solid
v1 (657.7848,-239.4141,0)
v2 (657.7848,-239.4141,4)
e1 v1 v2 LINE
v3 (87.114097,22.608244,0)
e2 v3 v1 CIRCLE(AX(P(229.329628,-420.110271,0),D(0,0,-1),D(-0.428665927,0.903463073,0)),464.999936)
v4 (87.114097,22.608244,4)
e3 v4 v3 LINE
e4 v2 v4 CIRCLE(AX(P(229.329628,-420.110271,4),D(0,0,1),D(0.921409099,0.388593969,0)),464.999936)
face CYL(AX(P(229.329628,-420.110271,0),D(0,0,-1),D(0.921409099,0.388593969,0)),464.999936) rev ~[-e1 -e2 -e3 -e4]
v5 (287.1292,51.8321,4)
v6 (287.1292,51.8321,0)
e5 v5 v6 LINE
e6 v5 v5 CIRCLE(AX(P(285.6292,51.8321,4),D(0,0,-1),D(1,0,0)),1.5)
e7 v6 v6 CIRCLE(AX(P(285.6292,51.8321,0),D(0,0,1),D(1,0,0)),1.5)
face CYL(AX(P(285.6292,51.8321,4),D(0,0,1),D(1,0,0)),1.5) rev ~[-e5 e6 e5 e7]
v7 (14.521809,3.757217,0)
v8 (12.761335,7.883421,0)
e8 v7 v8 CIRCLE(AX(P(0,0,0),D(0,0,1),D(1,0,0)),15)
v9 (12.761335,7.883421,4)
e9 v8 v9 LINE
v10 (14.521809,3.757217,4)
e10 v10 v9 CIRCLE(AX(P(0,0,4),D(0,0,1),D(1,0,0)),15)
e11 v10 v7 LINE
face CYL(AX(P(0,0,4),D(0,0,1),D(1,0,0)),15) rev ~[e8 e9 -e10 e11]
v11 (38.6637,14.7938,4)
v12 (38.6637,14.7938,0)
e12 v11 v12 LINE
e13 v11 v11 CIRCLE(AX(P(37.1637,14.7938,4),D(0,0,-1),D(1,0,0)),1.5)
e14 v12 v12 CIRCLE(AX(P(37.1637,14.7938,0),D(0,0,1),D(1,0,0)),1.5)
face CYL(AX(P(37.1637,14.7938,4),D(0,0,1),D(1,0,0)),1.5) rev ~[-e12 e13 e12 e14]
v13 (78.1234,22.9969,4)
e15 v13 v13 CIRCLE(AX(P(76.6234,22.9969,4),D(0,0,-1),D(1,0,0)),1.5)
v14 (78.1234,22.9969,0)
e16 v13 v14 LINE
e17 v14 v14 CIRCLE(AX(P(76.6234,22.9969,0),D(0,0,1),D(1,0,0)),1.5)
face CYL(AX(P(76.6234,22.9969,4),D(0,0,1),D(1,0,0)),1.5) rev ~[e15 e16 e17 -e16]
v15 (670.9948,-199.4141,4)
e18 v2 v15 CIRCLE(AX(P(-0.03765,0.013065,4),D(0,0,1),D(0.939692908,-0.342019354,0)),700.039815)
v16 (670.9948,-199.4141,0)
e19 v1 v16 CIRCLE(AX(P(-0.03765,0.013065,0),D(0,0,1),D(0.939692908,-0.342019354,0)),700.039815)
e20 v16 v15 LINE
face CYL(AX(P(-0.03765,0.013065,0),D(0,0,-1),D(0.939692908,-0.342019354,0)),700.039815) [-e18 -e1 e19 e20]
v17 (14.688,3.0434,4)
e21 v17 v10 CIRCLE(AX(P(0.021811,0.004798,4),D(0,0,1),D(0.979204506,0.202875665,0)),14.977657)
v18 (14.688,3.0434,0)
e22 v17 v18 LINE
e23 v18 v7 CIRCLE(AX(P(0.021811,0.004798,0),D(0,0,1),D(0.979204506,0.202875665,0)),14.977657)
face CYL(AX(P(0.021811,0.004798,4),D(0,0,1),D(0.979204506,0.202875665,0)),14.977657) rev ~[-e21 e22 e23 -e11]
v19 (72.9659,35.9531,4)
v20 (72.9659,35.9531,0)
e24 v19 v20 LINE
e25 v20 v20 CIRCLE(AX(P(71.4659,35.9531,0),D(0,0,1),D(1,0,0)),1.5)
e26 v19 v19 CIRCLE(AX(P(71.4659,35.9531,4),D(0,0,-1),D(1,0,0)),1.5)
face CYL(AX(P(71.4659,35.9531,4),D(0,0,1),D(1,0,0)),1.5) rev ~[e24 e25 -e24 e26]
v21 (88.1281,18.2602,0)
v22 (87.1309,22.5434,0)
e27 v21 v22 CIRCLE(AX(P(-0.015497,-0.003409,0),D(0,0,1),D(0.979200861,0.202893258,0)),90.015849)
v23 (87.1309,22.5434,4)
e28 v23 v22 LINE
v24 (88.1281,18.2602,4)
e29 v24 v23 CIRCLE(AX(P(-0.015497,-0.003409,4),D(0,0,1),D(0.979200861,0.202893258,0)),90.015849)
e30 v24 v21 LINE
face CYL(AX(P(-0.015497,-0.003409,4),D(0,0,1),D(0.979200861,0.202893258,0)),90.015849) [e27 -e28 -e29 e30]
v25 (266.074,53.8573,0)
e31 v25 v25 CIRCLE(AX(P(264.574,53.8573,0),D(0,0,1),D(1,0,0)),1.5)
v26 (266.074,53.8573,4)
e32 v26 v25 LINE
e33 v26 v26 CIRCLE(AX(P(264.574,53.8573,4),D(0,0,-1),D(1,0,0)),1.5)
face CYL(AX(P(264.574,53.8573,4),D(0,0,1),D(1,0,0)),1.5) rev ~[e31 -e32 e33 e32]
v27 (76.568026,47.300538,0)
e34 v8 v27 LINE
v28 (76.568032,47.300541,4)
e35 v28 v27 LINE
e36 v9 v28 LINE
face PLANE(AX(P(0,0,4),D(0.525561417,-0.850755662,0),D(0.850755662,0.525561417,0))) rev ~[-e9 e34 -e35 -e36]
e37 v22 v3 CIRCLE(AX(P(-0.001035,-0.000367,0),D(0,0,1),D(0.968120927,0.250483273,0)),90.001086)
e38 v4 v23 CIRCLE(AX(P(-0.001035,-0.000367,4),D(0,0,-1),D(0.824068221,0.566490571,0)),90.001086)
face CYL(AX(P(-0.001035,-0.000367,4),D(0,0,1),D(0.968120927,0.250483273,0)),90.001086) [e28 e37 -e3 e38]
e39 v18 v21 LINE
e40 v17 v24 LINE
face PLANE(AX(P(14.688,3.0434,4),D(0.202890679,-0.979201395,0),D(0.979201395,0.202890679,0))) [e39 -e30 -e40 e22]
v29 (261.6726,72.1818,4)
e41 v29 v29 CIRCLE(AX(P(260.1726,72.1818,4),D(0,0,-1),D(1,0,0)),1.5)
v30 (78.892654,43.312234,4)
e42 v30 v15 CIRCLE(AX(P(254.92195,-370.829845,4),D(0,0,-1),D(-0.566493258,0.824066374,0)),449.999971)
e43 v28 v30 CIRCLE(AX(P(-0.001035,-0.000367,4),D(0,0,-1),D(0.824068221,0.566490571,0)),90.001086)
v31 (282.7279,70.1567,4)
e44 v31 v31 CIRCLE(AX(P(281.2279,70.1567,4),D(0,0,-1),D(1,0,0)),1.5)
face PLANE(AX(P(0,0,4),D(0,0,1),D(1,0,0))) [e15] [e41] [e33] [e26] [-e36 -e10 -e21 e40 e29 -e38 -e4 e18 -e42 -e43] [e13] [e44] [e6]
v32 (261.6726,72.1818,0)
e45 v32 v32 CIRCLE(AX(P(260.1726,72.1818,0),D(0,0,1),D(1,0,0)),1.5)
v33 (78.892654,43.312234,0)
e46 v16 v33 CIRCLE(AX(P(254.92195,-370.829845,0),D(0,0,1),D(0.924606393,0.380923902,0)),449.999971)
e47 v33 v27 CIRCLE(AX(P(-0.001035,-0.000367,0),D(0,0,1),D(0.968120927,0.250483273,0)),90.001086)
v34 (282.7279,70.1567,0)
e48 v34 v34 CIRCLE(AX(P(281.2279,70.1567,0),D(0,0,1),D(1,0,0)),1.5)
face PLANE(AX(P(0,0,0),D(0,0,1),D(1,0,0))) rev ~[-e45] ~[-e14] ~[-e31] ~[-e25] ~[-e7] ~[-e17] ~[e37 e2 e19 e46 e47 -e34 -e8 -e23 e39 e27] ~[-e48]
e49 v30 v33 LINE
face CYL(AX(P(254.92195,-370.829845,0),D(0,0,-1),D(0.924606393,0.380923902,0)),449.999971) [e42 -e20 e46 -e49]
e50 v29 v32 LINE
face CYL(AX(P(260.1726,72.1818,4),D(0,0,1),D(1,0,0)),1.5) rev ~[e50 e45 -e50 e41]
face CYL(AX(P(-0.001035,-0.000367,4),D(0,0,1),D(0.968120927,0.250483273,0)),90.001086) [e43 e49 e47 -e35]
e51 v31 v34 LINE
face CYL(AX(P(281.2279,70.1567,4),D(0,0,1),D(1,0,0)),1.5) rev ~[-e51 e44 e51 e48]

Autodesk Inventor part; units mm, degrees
ref_plane "YZ Plane" through (0, 0, 0) normal (1, 0, 0) x (0, 1, 0)
ref_plane "XZ Plane" through (0, 0, 0) normal (0, 1, 0) x (-1, 0, 0)
ref_plane "XY Plane" through (0, 0, 0) normal (0, 0, 1) x (1, 0, 0)
sketch "Sketch1" plane through (0, 0, 0) normal (0, 0, 1) x (1, 0, 0)
  arc A0 (670.9948, -199.4141) -> (0, 0) centre (254.9219, -370.8299) ccw
  arc A1 (657.7848, -239.4141) -> (30, 0) centre (229.3296, -420.1103) ccw
  arc A2 (657.7848, -239.4141) -> (670.9948, -199.4141) centre (0, 0) ccw
  line L0 (0, 0) -> (30, 0)
  line L1 (657.7848, -239.4141) -> (0, 0)
  line L2 (-143.7228, 0) -> (862.3369, 0) projected
  point P0 (0, 0)
  dimension "d1" = 30
  dimension "d2" = 40
  dimension "d4" = 20
  dimension "d5" = 465
  dimension "d6" = 450
  dimension "d22" = 700
extrude "Extrusion1" add sketch "Sketch1" along normal blind 4 contours A2 A1 L2 A0 | L2 A1 L0 A0
sketch "Sketch2" plane through (0, 0, 4) normal (0, 0, 1) x (1, 0, 0)
  arc A0 (670.9948, -199.4141) -> (0, 0) centre (254.9219, -370.8299) ccw projected
  arc A1 (87.1309, 22.5434) -> (74.166, 50.9844) centre (0, 0) ccw
  line L0 (74.166, 50.9844) -> (0, 0)
  line L1 (0, 0) -> (87.1309, 22.5434)
  line L2 (0, 0) -> (30, 0) projected
  point P0 (78.8927, 43.3122)
  point P1 (0, 0)
  point P2 (0, 0)
  dimension "d9" = 90
  dimension "d16" = 20
extrude "Extrusion2" add sketch "Sketch2" against normal blind 4
sketch "Sketch4" plane through (0, 0, 4) normal (0, 0, 1) x (1, 0, 0)
  line L0 (86.0304, 22.2587) -> (87.1309, 22.5434) projected
  line L1 (74.166, 50.9844) -> (0, 0) projected
  line L2 (87.1309, 22.5434) -> (0, 0)
  line L3 (0, 0) -> (30, 0)
  arc A0 (86.0304, 22.2587) -> (30, 0) centre (229.3296, -420.1103) ccw projected
  line L4 (30, 0) -> (86.0304, 22.2587)
  point P0 (86.0304, 22.2587)
extrude "Extrusion4" cut sketch "Sketch4" against normal blind 10 contours A0 L3 L2
sketch "Sketch6" plane through (0, 0, 4) normal (0, 0, 1) x (1, 0, 0)
  circle A0 centre (71.4659, 35.9531) radius 1.5
  circle A1 centre (76.6234, 22.9969) radius 1.5
  circle A2 centre (37.1637, 14.7938) radius 1.5
  line L0 (0, 0) -> (87.1309, 22.5434) projected
  line L1 (37.1637, 14.7938) -> (0, 0)
  line L2 (0, 0) -> (71.4659, 35.9531)
  line L3 (74.166, 50.9844) -> (0, 0) projected
  line L4 (76.6234, 22.9969) -> (0, 0)
  circle A3 centre (264.574, 53.8573) radius 1.5
  circle A4 centre (260.1726, 72.1818) radius 1.5
  line L5 (261.3927, 67.6302) -> (0, 0)
  line L6 (264.574, 53.8573) -> (0, 0)
  circle A5 centre (281.2279, 70.1567) radius 1.5
  circle A6 centre (285.6292, 51.8321) radius 1.5
  line L7 (264.574, 53.8573) -> (260.1726, 72.1818)
  line L8 (281.2279, 70.1567) -> (260.1726, 72.1818)
  line L9 (281.2279, 70.1567) -> (285.6292, 51.8321)
  line L10 (285.6292, 51.8321) -> (264.574, 53.8573)
  line L11 (260.1726, 72.1818) -> (0, 0)
  dimension "d23" = 7.2
  dimension "d24" = 2.2
  dimension "d25" = 7.8
  dimension "d26" = 80
  dimension "d27" = 80
  dimension "d28" = 40
  dimension "d29" = 3
  dimension "d30" = 3
  dimension "d31" = 3
  dimension "d34" = 3
  dimension "d35" = 3
  dimension "d36" = 3
  dimension "d38" = 270
  dimension "d39" = 270
  dimension "d40" = 109
  dimension "d41" = 3
  dimension "d42" = 3
  dimension "d43" = 20
  dimension "d47" = 1
  dimension "d48" = 270
extrude "Extrusion6" cut sketch "Sketch6" against normal blind 10 from surface at 0 contours A0 | A1 | A2 | L6 L10 A3 | A3 L7 L6 | L11 L7 A4 | A4 L8 L11 | A3 L10 L7 | L7 L8 A4 | L10 L9 A6 | A6 L9 L10 | L8 L9 A5 | A5 L9 L8
sketch "Sketch7" plane through (0, 0, 4) normal (0, 0, 1) x (1, 0, 0)
  line L0 (87.1309, 22.5434) -> (0, 0) projected
  circle A0 centre (0, 0) radius 15
  dimension "d44" = 30
extrude "Extrusion7" cut sketch "Sketch7" against normal blind 10
sketch "Sketch8" plane through (0, 0, 4) normal (0, 0, 1) x (1, 0, 0)
  arc A0 (78.8927, 43.3122) -> (74.166, 50.9844) centre (0, 0) ccw projected
  line L0 (74.166, 50.9844) -> (0, 0)
  line L1 (12.361, 8.4974) -> (74.166, 50.9844) projected
  line L2 (0, 0) -> (82.5313, 50.9844)
  line L3 (82.5313, 50.9844) -> (74.166, 50.9844)
  point P0 (76.568, 47.3005)
  dimension "d49" = 2.8
extrude "Extrusion8" cut sketch "Sketch8" against normal blind 10 contours L2 L0 A0
sketch "Sketch9" plane through (0, 0, 4) normal (0, 0, 1) x (1, 0, 0)
  line L0 (14.5218, 3.7572) -> (87.1309, 22.5434)
  line L1 (87.1309, 22.5434) -> (14.5218, 3.7572) projected
  arc A0 (14.688, 3.0434) -> (14.5218, 3.7572) centre (0, 0) ccw
  line L2 (14.688, 3.0434) -> (88.1281, 18.2602)
  arc A1 (88.1281, 18.2602) -> (87.1309, 22.5434) centre (0, 0) ccw
  line L3 (14.688, 3.0434) -> (0, 0)
  line L4 (0, 0) -> (14.5218, 3.7572)
  arc A2 (78.8927, 43.3122) -> (76.568, 47.3005) centre (0, 0) ccw projected
  dimension "d52" = 2.8
extrude "Extrusion9" add sketch "Sketch9" against normal blind 4 contours L0 A1 L2 A0
properties part number "spoke3"
